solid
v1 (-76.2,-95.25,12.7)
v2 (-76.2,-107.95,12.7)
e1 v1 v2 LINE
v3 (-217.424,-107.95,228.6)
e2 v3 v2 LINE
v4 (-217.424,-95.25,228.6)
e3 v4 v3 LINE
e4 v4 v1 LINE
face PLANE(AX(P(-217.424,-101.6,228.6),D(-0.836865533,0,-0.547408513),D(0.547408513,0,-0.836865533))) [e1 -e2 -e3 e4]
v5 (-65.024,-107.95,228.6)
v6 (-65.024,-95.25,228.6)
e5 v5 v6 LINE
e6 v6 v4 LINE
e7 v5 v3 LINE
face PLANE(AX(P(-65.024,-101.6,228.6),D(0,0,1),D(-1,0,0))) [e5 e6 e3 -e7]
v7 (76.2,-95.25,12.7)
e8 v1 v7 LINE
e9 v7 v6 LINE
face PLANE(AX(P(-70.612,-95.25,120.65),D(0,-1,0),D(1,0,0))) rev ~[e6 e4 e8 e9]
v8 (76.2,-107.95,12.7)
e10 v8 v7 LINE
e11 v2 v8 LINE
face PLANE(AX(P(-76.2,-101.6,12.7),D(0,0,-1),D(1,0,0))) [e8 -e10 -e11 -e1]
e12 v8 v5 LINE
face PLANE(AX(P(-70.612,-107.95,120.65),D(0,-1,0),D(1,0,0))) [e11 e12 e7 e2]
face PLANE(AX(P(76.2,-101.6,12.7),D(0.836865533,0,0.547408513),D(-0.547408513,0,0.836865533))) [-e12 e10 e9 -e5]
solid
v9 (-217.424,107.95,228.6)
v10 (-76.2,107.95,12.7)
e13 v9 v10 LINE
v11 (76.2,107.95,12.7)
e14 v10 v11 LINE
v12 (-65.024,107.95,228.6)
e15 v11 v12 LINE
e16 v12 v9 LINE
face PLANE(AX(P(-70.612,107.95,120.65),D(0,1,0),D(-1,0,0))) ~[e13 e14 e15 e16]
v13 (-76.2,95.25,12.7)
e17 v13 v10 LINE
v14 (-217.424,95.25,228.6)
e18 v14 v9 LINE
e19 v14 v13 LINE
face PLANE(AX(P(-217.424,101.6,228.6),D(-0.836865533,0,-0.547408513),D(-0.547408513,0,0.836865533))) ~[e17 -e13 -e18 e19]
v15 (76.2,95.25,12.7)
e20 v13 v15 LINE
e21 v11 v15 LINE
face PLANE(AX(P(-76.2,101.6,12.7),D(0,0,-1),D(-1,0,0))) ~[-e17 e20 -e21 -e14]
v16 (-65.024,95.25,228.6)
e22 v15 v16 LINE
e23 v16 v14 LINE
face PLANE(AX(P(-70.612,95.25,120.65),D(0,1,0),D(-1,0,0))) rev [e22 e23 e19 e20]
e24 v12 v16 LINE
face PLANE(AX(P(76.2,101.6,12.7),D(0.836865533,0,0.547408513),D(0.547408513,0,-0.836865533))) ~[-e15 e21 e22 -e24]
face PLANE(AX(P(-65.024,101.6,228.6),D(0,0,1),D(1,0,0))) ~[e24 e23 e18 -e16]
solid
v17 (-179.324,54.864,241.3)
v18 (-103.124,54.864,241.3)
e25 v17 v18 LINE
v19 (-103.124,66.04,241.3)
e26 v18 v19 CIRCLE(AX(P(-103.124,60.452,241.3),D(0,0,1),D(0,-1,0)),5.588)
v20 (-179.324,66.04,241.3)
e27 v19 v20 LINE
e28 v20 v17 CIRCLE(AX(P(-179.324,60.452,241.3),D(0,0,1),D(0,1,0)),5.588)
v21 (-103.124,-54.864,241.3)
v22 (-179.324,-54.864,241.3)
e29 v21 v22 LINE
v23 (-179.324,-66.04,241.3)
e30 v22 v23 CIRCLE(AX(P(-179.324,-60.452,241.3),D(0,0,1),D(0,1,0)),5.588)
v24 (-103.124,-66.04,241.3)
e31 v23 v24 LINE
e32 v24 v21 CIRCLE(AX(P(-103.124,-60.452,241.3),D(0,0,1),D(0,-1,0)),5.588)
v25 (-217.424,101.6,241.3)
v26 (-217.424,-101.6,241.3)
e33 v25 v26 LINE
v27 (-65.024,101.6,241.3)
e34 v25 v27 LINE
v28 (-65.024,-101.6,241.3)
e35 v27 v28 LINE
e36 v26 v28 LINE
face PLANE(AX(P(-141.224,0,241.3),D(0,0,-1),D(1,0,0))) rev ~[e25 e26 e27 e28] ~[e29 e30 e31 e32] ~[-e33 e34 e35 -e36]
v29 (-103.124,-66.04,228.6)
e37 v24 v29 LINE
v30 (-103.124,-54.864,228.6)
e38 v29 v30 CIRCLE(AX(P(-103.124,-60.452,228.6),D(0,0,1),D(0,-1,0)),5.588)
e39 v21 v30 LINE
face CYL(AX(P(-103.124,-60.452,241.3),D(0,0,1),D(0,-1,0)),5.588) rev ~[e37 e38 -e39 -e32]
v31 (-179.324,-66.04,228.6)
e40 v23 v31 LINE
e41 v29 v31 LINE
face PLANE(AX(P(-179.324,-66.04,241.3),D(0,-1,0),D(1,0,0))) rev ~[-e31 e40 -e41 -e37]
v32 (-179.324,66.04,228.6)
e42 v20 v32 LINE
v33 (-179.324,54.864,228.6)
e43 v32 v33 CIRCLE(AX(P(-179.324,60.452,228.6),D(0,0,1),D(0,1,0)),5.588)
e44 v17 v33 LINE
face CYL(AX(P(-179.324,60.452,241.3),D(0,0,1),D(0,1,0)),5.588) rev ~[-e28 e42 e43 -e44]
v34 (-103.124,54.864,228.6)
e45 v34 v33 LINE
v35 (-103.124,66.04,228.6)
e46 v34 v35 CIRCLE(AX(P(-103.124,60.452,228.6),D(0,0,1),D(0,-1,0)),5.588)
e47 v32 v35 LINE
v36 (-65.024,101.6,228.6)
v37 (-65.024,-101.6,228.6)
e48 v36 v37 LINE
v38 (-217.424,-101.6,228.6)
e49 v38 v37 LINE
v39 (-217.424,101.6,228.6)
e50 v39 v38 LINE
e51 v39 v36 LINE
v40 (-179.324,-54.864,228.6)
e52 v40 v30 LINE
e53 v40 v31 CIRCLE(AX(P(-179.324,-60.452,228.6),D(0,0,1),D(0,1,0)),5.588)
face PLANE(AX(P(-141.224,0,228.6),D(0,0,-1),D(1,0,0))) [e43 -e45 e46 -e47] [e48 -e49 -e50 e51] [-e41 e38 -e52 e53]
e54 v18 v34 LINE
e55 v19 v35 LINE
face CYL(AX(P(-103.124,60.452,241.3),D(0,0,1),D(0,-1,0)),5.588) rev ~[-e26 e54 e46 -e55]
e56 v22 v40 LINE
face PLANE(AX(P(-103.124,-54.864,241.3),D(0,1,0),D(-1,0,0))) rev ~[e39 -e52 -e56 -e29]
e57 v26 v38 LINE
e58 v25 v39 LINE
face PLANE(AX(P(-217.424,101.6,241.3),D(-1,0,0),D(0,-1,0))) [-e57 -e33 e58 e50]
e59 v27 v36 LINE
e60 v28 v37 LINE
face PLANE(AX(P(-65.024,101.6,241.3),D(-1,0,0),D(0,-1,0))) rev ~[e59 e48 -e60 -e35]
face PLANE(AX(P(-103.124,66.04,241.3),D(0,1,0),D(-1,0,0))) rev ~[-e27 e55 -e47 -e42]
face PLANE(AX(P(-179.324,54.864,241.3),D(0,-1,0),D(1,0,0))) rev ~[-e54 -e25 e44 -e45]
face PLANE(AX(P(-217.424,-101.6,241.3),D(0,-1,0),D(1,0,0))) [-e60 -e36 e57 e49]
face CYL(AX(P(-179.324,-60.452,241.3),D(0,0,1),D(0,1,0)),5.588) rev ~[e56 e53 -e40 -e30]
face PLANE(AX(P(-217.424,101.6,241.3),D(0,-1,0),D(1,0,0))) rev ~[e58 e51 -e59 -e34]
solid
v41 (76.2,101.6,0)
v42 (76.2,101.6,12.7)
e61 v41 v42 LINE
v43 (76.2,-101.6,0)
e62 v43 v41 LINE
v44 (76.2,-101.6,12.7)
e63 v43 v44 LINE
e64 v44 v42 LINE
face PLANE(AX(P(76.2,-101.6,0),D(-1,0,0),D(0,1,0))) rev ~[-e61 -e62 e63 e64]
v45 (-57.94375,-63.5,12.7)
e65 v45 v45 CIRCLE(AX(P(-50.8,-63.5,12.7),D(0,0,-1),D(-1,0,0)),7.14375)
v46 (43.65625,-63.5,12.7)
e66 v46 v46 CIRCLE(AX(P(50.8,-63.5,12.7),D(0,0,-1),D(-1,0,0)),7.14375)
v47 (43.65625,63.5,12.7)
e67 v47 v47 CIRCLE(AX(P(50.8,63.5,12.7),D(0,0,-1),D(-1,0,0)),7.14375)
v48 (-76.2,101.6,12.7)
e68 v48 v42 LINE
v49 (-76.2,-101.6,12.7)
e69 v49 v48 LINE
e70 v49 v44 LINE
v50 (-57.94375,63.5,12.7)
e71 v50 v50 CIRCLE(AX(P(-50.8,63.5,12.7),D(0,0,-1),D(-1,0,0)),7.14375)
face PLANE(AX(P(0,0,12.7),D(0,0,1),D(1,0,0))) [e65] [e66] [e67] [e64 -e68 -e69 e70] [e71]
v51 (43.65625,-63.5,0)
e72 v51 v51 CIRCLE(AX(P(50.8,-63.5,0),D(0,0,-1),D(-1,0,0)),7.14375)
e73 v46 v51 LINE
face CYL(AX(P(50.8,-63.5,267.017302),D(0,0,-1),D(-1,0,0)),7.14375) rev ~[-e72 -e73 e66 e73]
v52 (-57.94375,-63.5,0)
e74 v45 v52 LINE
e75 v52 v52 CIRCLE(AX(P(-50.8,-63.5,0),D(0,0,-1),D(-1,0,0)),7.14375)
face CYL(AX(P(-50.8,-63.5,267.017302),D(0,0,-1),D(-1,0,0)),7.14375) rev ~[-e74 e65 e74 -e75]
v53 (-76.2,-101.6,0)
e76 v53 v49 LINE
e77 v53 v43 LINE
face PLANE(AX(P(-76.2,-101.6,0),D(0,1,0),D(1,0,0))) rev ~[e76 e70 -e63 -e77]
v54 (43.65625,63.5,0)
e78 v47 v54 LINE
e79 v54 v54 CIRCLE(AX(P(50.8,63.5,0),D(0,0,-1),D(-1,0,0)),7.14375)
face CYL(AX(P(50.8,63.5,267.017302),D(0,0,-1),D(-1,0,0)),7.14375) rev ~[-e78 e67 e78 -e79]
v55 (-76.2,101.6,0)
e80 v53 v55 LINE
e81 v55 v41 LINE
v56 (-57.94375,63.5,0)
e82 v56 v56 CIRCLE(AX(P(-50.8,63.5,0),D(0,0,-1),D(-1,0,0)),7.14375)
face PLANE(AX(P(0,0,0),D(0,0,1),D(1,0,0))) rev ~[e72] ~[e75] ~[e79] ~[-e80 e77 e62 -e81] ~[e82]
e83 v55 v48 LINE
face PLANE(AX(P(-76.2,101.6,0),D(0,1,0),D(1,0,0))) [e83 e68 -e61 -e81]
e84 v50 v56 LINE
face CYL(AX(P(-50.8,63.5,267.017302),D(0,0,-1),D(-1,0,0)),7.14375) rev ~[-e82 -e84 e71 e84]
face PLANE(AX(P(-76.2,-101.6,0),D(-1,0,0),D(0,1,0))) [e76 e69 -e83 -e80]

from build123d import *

# Parameters (mm, degrees)
F0_W      = 152.4
F0_H      = 203.2
F1_DEPTH  = 12.7
F3_D      = 14.2875
F5_W      = 152.4
F5_H      = 203.2
F6_DEPTH  = 12.7
F8_DEPTH  = 241.301
F10_DEPTH = 6.35


# Not quite as in the source:
# - a length typed as a fraction of an inch, garbled in the dataset ("3 / 203.2 mm" for 3/8 in), is restored


with BuildPart() as f1:
    # F0 (on Top) → F1 (new body)
    with BuildSketch(Plane.XY):
        Rectangle(F0_W, F0_H)
    extrude(amount=F1_DEPTH)

    # F3 (through all)
    with Locations(Plane.XY.offset(12.7)):
        with Locations((-50.8, 63.5), (50.8, 63.5), (-50.8, -63.5), (50.8, -63.5)):
            Hole(F3_D / 2)


with BuildPart() as f6:
    # F5 (on offset) → F6 (new body)
    with BuildSketch(Plane(origin=(0, 0, 241.3), x_dir=(1, 0, 0), z_dir=(0, 0, -1))):
        with Locations((-141.224, 0)):
            Rectangle(F5_W, F5_H)
    extrude(amount=F6_DEPTH)

    # F7 (on face) → F8 (cut, through all)
    with BuildSketch(Plane.XY.offset(241.3)):
        with BuildLine():
            ThreePointArc((-179.324, -54.864), (-184.912, -60.452), (-179.324, -66.04))
            Line((-179.324, -66.04), (-103.124, -66.04))
            ThreePointArc((-103.124, -66.04), (-97.536, -60.452), (-103.124, -54.864))
            Line((-103.124, -54.864), (-179.324, -54.864))
        make_face()
        with BuildLine():
            Line((-179.324, 54.864), (-103.124, 54.864))
            ThreePointArc((-103.124, 54.864), (-97.536, 60.452), (-103.124, 66.04))
            Line((-103.124, 66.04), (-179.324, 66.04))
            ThreePointArc((-179.324, 66.04), (-184.912, 60.452), (-179.324, 54.864))
        make_face()
    extrude(amount=-F8_DEPTH, mode=Mode.SUBTRACT)


with BuildPart() as f10:
    # F9 (on face) → F10 (new body, symmetric)
    with BuildSketch(Plane.XZ.offset(101.6)):
        Polygon((-65.024, 228.6), (-217.424, 228.6), (-76.2, 12.7), (76.2, 12.7), align=None)
    extrude(amount=F10_DEPTH, both=True)


with BuildPart() as f11_1:
    # F11: instance of F10
    add(f10.part.mirror(Plane.XZ))


solid = Compound([f1.part, f6.part, f10.part, f11_1.part])
